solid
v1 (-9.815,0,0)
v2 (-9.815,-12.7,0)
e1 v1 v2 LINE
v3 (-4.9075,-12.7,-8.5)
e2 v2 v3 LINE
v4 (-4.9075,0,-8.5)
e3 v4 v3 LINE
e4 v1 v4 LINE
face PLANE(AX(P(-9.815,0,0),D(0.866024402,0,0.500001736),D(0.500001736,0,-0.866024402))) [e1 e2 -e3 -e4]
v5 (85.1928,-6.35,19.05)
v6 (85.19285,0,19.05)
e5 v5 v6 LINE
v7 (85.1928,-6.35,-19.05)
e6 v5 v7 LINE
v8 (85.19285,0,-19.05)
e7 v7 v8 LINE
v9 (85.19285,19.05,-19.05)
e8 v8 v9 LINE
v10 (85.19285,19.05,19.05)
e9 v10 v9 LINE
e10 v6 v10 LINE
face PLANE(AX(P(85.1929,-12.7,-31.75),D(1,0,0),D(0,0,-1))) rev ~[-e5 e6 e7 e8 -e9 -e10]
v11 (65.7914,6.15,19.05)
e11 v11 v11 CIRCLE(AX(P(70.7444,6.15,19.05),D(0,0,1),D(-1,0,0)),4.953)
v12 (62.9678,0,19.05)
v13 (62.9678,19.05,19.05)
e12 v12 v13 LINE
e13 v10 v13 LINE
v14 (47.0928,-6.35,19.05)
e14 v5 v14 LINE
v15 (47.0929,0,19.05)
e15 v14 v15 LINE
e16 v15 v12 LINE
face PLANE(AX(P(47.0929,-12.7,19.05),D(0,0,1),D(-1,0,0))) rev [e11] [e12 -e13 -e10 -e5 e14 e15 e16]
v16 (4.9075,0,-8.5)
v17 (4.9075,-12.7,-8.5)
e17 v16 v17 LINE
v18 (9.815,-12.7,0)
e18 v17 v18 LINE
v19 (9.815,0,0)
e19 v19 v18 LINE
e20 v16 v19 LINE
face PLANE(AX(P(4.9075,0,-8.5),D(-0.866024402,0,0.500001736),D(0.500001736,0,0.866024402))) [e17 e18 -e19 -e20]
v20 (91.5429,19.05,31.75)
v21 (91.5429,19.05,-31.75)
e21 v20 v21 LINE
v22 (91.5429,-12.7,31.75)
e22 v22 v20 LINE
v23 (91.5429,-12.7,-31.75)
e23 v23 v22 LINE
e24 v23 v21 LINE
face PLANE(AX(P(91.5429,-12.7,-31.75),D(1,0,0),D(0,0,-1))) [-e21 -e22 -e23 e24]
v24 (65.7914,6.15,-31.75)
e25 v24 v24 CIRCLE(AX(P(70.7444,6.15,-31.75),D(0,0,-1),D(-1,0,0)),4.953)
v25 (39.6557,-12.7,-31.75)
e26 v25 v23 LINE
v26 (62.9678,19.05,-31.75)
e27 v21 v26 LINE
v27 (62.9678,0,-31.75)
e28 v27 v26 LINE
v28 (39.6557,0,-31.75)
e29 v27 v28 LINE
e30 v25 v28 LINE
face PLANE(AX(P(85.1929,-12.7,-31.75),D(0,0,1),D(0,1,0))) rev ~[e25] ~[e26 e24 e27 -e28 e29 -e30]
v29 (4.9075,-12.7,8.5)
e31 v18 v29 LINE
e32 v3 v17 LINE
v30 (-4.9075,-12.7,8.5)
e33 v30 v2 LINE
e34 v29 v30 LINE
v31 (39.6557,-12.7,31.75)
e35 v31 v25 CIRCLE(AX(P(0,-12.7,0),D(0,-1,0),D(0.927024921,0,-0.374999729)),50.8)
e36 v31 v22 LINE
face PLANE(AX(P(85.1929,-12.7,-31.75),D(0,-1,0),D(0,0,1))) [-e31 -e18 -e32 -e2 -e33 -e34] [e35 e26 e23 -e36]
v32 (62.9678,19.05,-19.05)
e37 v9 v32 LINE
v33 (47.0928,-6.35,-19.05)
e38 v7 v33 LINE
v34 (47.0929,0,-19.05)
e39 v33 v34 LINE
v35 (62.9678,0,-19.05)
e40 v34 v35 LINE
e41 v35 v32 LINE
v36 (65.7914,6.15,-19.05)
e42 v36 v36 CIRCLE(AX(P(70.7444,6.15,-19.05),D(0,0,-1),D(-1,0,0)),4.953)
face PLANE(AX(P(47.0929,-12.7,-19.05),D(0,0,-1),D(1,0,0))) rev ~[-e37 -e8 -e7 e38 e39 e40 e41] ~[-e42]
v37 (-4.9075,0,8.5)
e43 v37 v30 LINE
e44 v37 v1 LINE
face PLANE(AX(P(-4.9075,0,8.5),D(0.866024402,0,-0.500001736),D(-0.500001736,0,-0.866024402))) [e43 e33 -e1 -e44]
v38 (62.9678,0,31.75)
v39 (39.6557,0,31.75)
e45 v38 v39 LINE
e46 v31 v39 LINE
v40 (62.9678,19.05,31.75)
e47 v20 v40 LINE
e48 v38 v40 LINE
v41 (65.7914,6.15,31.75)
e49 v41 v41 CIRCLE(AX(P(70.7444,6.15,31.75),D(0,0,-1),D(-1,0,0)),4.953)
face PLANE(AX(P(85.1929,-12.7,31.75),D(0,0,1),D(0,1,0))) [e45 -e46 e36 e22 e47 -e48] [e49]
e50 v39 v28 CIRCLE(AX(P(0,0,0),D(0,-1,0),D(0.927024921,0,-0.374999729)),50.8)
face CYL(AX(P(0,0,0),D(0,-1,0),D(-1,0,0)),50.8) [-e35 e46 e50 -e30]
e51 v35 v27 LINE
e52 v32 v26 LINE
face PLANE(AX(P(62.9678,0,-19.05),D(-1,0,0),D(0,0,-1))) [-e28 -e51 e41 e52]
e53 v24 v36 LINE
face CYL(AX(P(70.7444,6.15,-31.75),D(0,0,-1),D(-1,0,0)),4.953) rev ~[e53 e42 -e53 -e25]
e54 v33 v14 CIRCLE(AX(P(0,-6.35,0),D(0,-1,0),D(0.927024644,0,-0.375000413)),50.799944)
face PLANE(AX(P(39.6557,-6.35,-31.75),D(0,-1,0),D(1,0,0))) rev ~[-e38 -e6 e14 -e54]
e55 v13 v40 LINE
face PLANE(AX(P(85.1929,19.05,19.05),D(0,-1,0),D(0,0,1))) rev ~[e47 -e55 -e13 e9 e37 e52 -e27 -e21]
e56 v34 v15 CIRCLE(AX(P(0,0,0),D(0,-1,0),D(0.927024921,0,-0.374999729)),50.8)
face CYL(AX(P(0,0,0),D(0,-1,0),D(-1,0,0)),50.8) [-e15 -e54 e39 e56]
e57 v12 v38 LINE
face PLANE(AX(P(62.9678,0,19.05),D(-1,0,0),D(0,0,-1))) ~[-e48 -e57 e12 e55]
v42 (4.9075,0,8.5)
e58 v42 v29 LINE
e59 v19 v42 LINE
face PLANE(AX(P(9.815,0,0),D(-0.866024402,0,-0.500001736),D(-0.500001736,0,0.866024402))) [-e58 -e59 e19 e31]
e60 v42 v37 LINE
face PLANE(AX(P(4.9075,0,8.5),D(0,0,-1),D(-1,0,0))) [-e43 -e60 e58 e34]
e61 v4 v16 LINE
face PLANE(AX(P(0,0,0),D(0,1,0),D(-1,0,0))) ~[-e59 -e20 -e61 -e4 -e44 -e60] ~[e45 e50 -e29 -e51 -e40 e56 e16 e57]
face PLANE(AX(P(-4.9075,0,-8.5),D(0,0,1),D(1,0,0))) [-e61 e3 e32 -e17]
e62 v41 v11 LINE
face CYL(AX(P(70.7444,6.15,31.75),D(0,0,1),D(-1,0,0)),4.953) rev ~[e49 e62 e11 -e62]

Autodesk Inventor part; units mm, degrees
ref_plane "YZ Plane" through (0, 0, 0) normal (1, 0, 0) x (0, 1, 0)
ref_plane "XZ Plane" through (0, 0, 0) normal (0, 1, 0) x (-1, 0, 0)
ref_plane "XY Plane" through (0, 0, 0) normal (0, 0, 1) x (1, 0, 0)
sketch "Sketch1" plane through (0, 0, 0) normal (0, 0, 1) x (1, 0, 0)
  line L0 (0, 0) -> (-50.8, 0)
  line L1 (-50.8, 0) -> (-50.8, -12.7)
  line L2 (-50.8, -12.7) -> (-38.1, -12.7)
  line L3 (-12.0663, -25.4) -> (-12.0663, -48.26)
  line L4 (-5, -48.26) -> (-5, -16.764)
  line L5 (-5, -16.764) -> (0, -16.764)
  line L6 (0, -16.764) -> (0, 0)
  line L7 (-12.0663, -48.26) -> (-5, -48.26)
  line L8 (-38.1, -12.7) -> (-38.1, -25.4)
  line L9 (-38.1, -25.4) -> (-12.0663, -25.4)
  dimension "d0" = 50.8
  dimension "d1" = 5
  dimension "d2" = 12.0663
  dimension "d13" = 35.56
  dimension "d15" = 31.496
  dimension "d38" = 12.7
  dimension "d39" = 38.1
revolve "Revolution1" add sketch "Sketch1" angle 360 about axis through (0, -16.764, 0) along (0, 1, 0)
sketch "Sketch5" plane through (0, 0, 0) normal (0, 1, 0) x (1, 0, 0)
  circle A0 centre (0, 0) radius 5 projected
  line L0 (9.815, 0) -> (4.9075, -8.5)
  line L1 (4.9075, -8.5) -> (-4.9075, -8.5)
  line L2 (-4.9075, -8.5) -> (-9.815, 0)
  line L3 (-9.815, 0) -> (-4.9075, 8.5)
  line L4 (-4.9075, 8.5) -> (4.9075, 8.5)
  line L5 (4.9075, 8.5) -> (9.815, 0)
  point P0 (0, 0)
  point P1 (0, 0)
  dimension "d16" = 17
extrude "Extrusion1" cut sketch "Sketch5" against normal blind 12.7 contours A0 | L0 L1 L2 L3 L4 L5
sketch "Sketch7" plane through (0, -12.7, 0) normal (0, -1, 0) x (1, 0, 0)
  circle A0 centre (0, 0) radius 50.8 projected
  line L0 (47.0929, -19.05) -> (85.1929, -19.05)
  line L1 (85.1929, -19.05) -> (85.1929, -31.75)
  line L2 (85.1929, -31.75) -> (39.6557, -31.75)
  circle A1 centre (0, 0) radius 5 construction
  line L3 (0, 0) -> (5, 0) construction
  line L4 (50.8, 0) -> (83.823, 0) construction
  dimension "d23" = 38.1
  dimension "d24" = 12.7
  dimension "d25" = 19.05
extrude "Extrusion3" add sketch "Sketch7" against normal blind 12.7 contours A0 L0 L1 L2
sketch "Sketch8" plane through (39.6557, 0, -31.75) normal (0, 1, 0) x (1, 0, 0)
  line L0 (45.5371, -12.7) -> (45.5371, 0) projected
  line L1 (45.5371, 0) -> (0, 0) projected
  line L2 (7.4371, -12.7) -> (45.5371, -12.7) projected
  line L3 (35.8511, -107.95) -> (35.8511, 44.45)
  line L4 (26.3261, -107.95) -> (26.3261, 44.45)
  line L5 (45.5371, -12.7) -> (23.3121, -12.7)
  line L6 (23.3121, -12.7) -> (23.3121, 0)
  line L7 (23.3121, 0) -> (45.5371, 0)
  line L8 (45.5371, 0) -> (45.5371, -12.7)
  point P0 (-39.6557, -31.75)
  point P1 (23.3121, 0)
  point P2 (23.3121, -12.7)
  dimension "d28" = 22.225
extrude "Extrusion4" add sketch "Sketch8" along normal blind 19.05
sketch "Sketch9" plane through (85.1929, -12.7, -31.75) normal (0, 0, -1) x (-1, 0, 0)
  line L0 (22.225, 12.7) -> (22.225, 31.75) projected
  line L1 (0, 31.75) -> (22.225, 31.75) projected
  arc A0 (16.0423, 14.3621) -> (12.8546, 14.3621) centre (14.4485, 18.85) ccw projected
  line L2 (0, 0) -> (0, 31.75) projected
  circle A1 centre (14.4485, 18.85) radius 4.953
  point P0 (85.1929, 12.7)
  dimension "d31" = 9.906
extrude "Extrusion5" cut sketch "Sketch9" against normal through all
mirror "Mirror1" about plane through (0, 0, 0) normal (0, 0, 1) of "Extrusion4", "Extrusion5", "Extrusion3"
sketch "Sketch10" plane through (39.6557, -12.7, -31.75) normal (0, -1, 0) x (1, 0, 0)
  arc A0 (7.4371, 12.7) -> (7.4371, 50.8) centre (-39.6557, 31.75) ccw projected
  line L0 (45.5371, 50.8) -> (7.4371, 50.8) projected
  line L1 (45.5371, 12.7) -> (7.4371, 12.7) projected
  arc A1 (7.4371, 12.7) -> (7.4371, 50.8) centre (-39.6557, 31.75) ccw
  line L2 (7.4371, 50.8) -> (45.5371, 50.8)
  line L3 (45.5371, 0) -> (45.5371, 12.7) projected
  line L4 (45.5371, 50.8) -> (45.5371, 12.7)
  line L5 (45.5371, 12.7) -> (7.4371, 12.7)
extrude "Extrusion6" add sketch "Sketch10" against normal blind 6.35
sketch "Sketch11" plane through (85.1929, -12.7, -31.75) normal (1, 0, 0) x (0, 0, -1)
  line L0 (-63.5, 0) -> (-63.5, 31.75) projected
  line L1 (-50.8, 31.75) -> (-63.5, 31.75) projected
  line L2 (-12.7, 31.75) -> (0, 31.75) projected
  line L3 (0, 0) -> (0, 31.75) projected
  line L4 (0, 0) -> (-63.5, 0) projected
  line L5 (-63.5, 31.75) -> (0, 31.75)
  line L6 (0, 31.75) -> (0, 0)
  line L7 (0, 0) -> (-63.5, 0)
  line L8 (-63.5, 0) -> (-63.5, 31.75)
  point P0 (-31.75, 12.7)
  point P1 (-12.7, 31.75)
  point P2 (-50.8, 31.75)
extrude "Extrusion7" add sketch "Sketch11" along normal blind 6.35
sketch "Sketch13" plane through (0, -12.7, 0) normal (0, -1, 0) x (1, 0, 0)
  circle A0 centre (0, 0) radius 38.1
extrude "Extrusion8" cut sketch "Sketch13" along normal through all
equation "\"d0\" = topPartRadius"
equation "\"d2\" = stemRadius"
equation "\"d15\" = internalHoleDepth"
equation "\"topPartRadius\" = 0.5 * topPartDiameter"
equation "\"totalHeight\" = 35.56"
equation "\"stemRadius\" = 12.06627"
equation "\"stemHeight\" = 22.86"
equation "\"internalHoleDepth\" = 31.496"
equation "\"topPartDiameter\" = 101.6"
properties part number "celestronTripodAdapterTop" material "PC/ABS Plastic"
